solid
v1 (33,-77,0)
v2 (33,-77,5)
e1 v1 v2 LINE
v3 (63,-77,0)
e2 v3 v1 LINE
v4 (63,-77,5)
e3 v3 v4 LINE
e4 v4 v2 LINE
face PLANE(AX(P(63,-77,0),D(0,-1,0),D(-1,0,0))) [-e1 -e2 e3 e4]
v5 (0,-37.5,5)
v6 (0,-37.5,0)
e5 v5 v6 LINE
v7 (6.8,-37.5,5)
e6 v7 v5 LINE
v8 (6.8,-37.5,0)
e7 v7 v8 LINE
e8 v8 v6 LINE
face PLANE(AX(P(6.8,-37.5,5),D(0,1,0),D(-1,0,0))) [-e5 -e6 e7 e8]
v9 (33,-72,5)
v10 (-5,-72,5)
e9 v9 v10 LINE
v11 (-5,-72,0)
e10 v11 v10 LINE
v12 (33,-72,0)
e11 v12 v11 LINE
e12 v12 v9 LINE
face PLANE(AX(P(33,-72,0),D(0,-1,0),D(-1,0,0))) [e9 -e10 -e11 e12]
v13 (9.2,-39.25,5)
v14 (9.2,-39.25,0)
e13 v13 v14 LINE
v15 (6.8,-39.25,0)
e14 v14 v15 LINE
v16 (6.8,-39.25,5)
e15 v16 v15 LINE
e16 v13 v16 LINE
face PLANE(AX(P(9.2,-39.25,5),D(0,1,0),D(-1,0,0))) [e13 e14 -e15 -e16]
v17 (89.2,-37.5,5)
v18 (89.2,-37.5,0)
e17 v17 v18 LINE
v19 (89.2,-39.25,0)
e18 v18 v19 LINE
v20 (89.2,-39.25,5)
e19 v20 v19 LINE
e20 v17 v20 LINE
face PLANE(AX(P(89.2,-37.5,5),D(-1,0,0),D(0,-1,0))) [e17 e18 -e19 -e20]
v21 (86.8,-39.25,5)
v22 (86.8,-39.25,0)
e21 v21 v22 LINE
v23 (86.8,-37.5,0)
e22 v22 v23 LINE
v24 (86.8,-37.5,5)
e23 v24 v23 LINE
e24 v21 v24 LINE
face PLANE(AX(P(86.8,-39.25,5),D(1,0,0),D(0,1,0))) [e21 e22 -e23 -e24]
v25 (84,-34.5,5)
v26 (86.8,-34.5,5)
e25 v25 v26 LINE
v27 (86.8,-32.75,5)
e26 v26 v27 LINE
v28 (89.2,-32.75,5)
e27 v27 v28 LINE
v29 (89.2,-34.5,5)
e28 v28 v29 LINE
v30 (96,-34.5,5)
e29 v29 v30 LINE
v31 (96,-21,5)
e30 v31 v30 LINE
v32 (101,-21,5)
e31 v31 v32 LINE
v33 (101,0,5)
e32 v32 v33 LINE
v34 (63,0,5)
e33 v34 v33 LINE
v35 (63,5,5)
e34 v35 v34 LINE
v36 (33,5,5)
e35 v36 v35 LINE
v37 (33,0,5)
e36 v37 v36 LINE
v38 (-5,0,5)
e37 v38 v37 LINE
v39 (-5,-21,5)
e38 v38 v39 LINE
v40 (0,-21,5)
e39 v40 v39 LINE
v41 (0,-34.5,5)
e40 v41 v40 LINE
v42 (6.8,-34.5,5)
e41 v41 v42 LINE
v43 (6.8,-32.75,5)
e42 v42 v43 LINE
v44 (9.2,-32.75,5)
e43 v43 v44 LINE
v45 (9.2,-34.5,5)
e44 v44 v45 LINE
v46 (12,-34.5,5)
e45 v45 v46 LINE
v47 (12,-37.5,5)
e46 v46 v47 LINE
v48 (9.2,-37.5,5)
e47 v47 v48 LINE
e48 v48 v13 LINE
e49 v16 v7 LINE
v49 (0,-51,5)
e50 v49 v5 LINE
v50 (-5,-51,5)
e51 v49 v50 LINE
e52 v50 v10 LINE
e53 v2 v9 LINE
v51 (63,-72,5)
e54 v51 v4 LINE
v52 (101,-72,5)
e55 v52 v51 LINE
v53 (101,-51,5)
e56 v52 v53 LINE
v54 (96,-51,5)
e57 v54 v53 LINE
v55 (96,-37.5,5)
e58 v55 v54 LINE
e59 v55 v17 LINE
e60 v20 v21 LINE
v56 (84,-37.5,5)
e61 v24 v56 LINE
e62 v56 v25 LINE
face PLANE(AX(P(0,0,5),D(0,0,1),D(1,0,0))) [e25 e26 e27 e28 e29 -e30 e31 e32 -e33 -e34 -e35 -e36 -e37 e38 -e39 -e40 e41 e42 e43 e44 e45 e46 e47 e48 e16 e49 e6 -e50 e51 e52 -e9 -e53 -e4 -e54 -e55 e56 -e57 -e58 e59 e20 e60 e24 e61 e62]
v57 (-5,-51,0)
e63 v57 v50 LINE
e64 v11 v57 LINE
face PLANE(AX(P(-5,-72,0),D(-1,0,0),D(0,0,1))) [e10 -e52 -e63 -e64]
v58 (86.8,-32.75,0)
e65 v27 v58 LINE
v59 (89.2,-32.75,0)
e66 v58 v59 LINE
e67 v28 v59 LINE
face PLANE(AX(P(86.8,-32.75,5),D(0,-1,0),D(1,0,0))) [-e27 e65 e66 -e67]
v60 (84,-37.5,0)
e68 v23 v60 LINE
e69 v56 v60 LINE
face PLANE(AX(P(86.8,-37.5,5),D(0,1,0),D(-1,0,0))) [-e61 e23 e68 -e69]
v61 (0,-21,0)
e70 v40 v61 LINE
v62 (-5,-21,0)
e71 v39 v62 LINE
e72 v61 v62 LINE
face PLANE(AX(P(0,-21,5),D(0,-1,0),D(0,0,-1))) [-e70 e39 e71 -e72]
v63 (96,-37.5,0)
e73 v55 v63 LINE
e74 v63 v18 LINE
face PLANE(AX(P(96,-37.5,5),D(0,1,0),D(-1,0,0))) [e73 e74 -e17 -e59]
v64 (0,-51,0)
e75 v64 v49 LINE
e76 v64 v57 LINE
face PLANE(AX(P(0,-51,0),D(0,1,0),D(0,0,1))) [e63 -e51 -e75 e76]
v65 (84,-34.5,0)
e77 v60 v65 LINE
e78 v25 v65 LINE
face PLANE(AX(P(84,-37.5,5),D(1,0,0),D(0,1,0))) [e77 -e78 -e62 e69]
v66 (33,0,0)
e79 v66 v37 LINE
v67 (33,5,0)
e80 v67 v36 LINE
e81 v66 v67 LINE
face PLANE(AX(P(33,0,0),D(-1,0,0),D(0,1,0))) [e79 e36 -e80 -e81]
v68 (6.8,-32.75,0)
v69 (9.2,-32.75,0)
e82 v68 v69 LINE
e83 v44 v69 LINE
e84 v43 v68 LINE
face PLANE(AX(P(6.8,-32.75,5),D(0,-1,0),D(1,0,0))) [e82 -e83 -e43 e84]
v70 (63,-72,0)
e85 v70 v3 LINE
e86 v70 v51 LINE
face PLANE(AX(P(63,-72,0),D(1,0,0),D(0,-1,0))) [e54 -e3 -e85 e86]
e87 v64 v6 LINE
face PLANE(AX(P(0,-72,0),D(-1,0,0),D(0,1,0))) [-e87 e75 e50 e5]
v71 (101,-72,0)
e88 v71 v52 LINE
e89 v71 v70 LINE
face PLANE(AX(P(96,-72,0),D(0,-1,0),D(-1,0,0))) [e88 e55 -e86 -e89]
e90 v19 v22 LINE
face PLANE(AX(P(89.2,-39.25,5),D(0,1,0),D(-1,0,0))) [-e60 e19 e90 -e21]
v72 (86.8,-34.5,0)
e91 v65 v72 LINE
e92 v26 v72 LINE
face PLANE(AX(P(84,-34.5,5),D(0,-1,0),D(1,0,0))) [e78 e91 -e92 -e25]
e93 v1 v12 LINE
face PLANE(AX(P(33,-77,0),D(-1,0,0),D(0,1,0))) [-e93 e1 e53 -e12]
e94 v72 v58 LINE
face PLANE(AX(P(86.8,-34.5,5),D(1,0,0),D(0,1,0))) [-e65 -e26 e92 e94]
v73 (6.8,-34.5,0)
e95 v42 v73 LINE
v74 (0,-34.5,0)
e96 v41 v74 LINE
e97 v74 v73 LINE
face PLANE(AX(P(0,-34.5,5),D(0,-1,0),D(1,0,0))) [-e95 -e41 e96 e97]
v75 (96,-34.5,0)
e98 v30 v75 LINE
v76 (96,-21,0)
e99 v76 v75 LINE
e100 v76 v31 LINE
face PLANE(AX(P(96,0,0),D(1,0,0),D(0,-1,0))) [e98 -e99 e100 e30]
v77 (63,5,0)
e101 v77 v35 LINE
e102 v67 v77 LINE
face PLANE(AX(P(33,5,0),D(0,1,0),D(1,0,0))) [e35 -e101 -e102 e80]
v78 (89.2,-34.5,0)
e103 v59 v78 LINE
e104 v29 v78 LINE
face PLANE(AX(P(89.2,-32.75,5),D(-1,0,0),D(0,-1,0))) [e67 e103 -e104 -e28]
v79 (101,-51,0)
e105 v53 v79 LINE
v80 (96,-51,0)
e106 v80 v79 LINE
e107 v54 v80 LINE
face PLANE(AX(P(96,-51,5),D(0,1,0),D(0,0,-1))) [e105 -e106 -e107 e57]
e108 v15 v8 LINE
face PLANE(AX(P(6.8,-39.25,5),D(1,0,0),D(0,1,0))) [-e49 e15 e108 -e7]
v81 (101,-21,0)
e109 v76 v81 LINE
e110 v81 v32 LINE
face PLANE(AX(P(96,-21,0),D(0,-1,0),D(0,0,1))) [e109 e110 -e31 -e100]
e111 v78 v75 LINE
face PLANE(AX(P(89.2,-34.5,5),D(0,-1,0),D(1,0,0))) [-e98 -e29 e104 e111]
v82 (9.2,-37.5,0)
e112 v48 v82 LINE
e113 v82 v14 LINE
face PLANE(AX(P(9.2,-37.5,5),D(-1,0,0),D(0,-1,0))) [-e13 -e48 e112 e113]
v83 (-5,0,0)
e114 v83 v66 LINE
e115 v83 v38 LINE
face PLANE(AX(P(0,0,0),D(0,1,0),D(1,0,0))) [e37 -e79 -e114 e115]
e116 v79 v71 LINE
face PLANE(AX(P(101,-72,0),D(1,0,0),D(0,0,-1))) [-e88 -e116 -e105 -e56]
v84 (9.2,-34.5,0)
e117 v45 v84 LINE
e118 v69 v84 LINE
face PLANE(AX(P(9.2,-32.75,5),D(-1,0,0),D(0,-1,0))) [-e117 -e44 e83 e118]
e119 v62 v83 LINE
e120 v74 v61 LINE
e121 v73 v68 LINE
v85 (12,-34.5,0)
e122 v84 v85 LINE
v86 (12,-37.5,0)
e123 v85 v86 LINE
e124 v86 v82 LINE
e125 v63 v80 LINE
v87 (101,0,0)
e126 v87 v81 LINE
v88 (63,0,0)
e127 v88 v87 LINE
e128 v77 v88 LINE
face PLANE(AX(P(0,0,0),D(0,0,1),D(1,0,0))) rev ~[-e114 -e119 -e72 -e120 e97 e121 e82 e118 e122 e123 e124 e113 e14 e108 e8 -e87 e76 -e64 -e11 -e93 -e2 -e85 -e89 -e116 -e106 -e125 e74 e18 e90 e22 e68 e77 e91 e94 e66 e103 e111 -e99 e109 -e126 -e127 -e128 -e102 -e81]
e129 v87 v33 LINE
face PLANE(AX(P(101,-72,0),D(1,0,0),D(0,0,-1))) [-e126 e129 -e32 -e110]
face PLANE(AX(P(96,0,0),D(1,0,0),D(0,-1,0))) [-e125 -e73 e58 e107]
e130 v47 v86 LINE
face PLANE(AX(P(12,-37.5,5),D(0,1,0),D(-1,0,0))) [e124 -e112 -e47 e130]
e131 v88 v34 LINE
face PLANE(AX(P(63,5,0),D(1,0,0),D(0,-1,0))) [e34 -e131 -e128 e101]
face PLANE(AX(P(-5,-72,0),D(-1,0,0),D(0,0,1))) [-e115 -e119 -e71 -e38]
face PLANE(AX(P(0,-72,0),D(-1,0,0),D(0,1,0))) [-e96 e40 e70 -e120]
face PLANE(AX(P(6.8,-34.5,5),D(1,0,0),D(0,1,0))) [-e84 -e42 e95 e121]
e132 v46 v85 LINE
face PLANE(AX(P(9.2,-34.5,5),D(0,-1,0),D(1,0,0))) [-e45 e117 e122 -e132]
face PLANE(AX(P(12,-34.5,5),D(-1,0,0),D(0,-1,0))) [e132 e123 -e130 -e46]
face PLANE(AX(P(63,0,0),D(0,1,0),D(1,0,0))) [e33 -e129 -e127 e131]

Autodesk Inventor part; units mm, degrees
ref_plane "YZ Plane" through (0, 0, 0) normal (1, 0, 0) x (0, 1, 0)
sketch "slot" plane through (0, 0, 0) normal (0, 0, 1) x (1, 0, 0)
  line L0 (-18.25, 14.2) -> (-11.75, 11.8) construction
  line L1 (-11.75, 14.2) -> (-18.25, 11.8) construction
  line L2 (-18.25, 14.2) -> (-16.5, 14.2)
  line L3 (-13.5, 14.2) -> (-11.75, 14.2)
  line L4 (-16.5, 9) -> (-16.5, 11.8)
  line L5 (-16.5, 14.2) -> (-16.5, 21)
  line L6 (-13.5, 21) -> (-13.5, 14.2)
  line L7 (-13.5, 11.8) -> (-13.5, 9)
  line L8 (-11.75, 11.8) -> (-13.5, 11.8)
  line L9 (-16.5, 11.8) -> (-18.25, 11.8)
  line L10 (-16.5, 21) -> (-13.5, 21)
  line L11 (-13.5, 9) -> (-16.5, 9)
  line L12 (-11.75, 14.2) -> (-11.75, 11.8)
  line L13 (-18.25, 11.8) -> (-18.25, 14.2)
  point P0 (-15, 21)
  point P1 (-15, 13)
  dimension "d8" = 3
  dimension "d9" = 12
  dimension "d10" = 6.5
  dimension "d11" = 2.4
  dimension "d12" = 8
ref_plane "工作平面1" through (0, 0, 0) normal (0, 0, 1) x (1, 0, 0)
sketch "草图2" plane through (0, 0, 0) normal (0, 0, 1) x (1, 0, 0)
  line L0 (74, -10) -> (74, -69) projected
  line L1 (74, -69) -> (69, -69) projected
  line L2 (69, -69) -> (69, -10) projected
  line L3 (69, -10) -> (74, -10) projected
  circle A0 centre (48, 2.5) radius 1.5 projected
  circle A1 centre (48, -74.5) radius 1.5 projected
  line L4 (33, -77) -> (33, -72) projected
  line L5 (63, -77) -> (33, -77) projected
  line L6 (63, -72) -> (63, -77) projected
  line L7 (96, -72) -> (63, -72) projected
  line L8 (96, 0) -> (96, -72) projected
  line L9 (63, 0) -> (96, 0) projected
  line L10 (63, 5) -> (63, 0) projected
  line L11 (33, 5) -> (63, 5) projected
  line L12 (33, 0) -> (33, 5) projected
  line L13 (0, 0) -> (33, 0) projected
  line L14 (0, -72) -> (0, 0) projected
  line L15 (33, -72) -> (0, -72) projected
extrude "拉伸2" add sketch "草图2" along normal blind 5 contours L0 L1 L2 L3 | A0 | A1 | L4 L15 L14 L13 L12 L11 L10 L9 L8 L7 L6 L5
sketch "草图3" plane through (0, -72, 0) normal (-1, 0, 0) x (0, 0, 1)
  line L0 (0, 0) -> (0, 72) projected
  line L1 (0, 0) -> (5, 0) projected
  line L2 (5, 72) -> (5, 0) projected
  line L3 (0, 72) -> (5, 72) projected
  circle A0 centre (2.5, 36) radius 1.5 projected
  circle A1 centre (-35, -2.5) radius 1.5 projected
  circle A2 centre (-85, -2.5) radius 1.5 projected
  circle A3 centre (-85, 74.5) radius 1.5 projected
  circle A4 centre (-35, 74.5) radius 1.5 projected
  line L4 (-20, 0) -> (-20, -5) projected
  line L5 (0, 0) -> (-20, 0) projected
  line L6 (0, 21) -> (0, 0) projected
  line L7 (0, 21) -> (5, 21) projected
  line L8 (5, 21) -> (5, 51) projected
  line L9 (5, 51) -> (0, 51) projected
  line L10 (0, 72) -> (0, 51) projected
  line L11 (-20, 72) -> (0, 72) projected
  line L12 (-20, 77) -> (-20, 72) projected
  line L13 (-50, 77) -> (-20, 77) projected
  line L14 (-50, 72) -> (-50, 77) projected
  line L15 (-70, 72) -> (-50, 72) projected
  line L16 (-70, 77) -> (-70, 72) projected
  line L17 (-100, 77) -> (-70, 77) projected
  line L18 (-100, 72) -> (-100, 77) projected
  line L19 (-121, 72) -> (-100, 72) projected
  line L20 (-121, 0) -> (-121, 72) projected
  line L21 (-100, 0) -> (-121, 0) projected
  line L22 (-100, -5) -> (-100, 0) projected
  line L23 (-70, -5) -> (-100, -5) projected
  line L24 (-70, 0) -> (-70, -5) projected
  line L25 (-50, 0) -> (-70, 0) projected
  line L26 (-50, -5) -> (-50, 0) projected
  line L27 (-20, -5) -> (-50, -5) projected
ref_plane "工作平面2" through (-5, -77, -121) normal (-1, 0, 0) x (0, 0, 1)
extrude "拉伸3" add sketch "草图3" along normal up to surface (5 mm away) contours L0 L7 L2 L1 | L0 L3 L2 L9
sketch "草图4" plane through (96, -72, 0) normal (1, 0, 0) x (0, 0, -1)
  line L0 (0, 72) -> (0, 0) projected
  line L1 (0, 72) -> (-5, 72) projected
  line L2 (-5, 0) -> (-5, 72) projected
  line L3 (0, 0) -> (-5, 0) projected
  circle A0 centre (-2.5, 36) radius 1.5 projected
  circle A1 centre (35, -2.5) radius 1.5 projected
  circle A2 centre (85, -2.5) radius 1.5 projected
  circle A3 centre (85, 74.5) radius 1.5 projected
  circle A4 centre (35, 74.5) radius 1.5 projected
  line L4 (20, 0) -> (20, -5) projected
  line L5 (20, -5) -> (50, -5) projected
  line L6 (50, -5) -> (50, 0) projected
  line L7 (50, 0) -> (70, 0) projected
  line L8 (70, 0) -> (70, -5) projected
  line L9 (70, -5) -> (100, -5) projected
  line L10 (100, -5) -> (100, 0) projected
  line L11 (100, 0) -> (121, 0) projected
  line L12 (121, 0) -> (121, 72) projected
  line L13 (121, 72) -> (100, 72) projected
  line L14 (100, 72) -> (100, 77) projected
  line L15 (100, 77) -> (70, 77) projected
  line L16 (70, 77) -> (70, 72) projected
  line L17 (70, 72) -> (50, 72) projected
  line L18 (50, 72) -> (50, 77) projected
  line L19 (50, 77) -> (20, 77) projected
  line L20 (20, 77) -> (20, 72) projected
  line L21 (20, 72) -> (0, 72) projected
  line L22 (0, 72) -> (0, 51) projected
  line L23 (0, 51) -> (-5, 51) projected
  line L24 (-5, 51) -> (-5, 21) projected
  line L25 (-5, 21) -> (0, 21) projected
  line L26 (0, 21) -> (0, 0) projected
  line L27 (0, 0) -> (20, 0) projected
ref_plane "工作平面3" through (101, -77, -121) normal (1, 0, 0) x (0, 1, 0)
extrude "拉伸4" add sketch "草图4" along normal up to surface (5 mm away) contours L0 L23 L2 L1 | L0 L3 L2 L25
sketch "草图5" plane through (0, 0, 5) normal (0, 0, 1) x (1, 0, 0)
  line L0 (0, -21) -> (0, -51) projected
  line L1 (96, -51) -> (96, -21) projected
  line L2 (-5, -37.5) -> (-5, -34.5) projected
  line L3 (101, -34.5) -> (101, -37.5) projected
  line L4 (6.8, -39.25) -> (9.2, -32.75) construction
  line L5 (6.8, -32.75) -> (9.2, -39.25) construction
  line L6 (6.8, -39.25) -> (6.8, -37.5)
  line L7 (6.8, -34.5) -> (6.8, -32.75)
  line L8 (12, -37.5) -> (9.2, -37.5)
  line L9 (6.8, -37.5) -> (0, -37.5)
  line L10 (0, -34.5) -> (6.8, -34.5)
  line L11 (9.2, -34.5) -> (12, -34.5)
  line L12 (9.2, -32.75) -> (9.2, -34.5)
  line L13 (9.2, -37.5) -> (9.2, -39.25)
  line L14 (0, -37.5) -> (0, -34.5)
  line L15 (12, -34.5) -> (12, -37.5)
  line L16 (6.8, -32.75) -> (9.2, -32.75)
  line L17 (9.2, -39.25) -> (6.8, -39.25)
  line L18 (89.2, -32.75) -> (86.8, -39.25) construction
  line L19 (89.2, -39.25) -> (86.8, -32.75) construction
  line L20 (89.2, -32.75) -> (89.2, -34.5)
  line L21 (89.2, -37.5) -> (89.2, -39.25)
  line L22 (84, -34.5) -> (86.8, -34.5)
  line L23 (89.2, -34.5) -> (96, -34.5)
  line L24 (96, -37.5) -> (89.2, -37.5)
  line L25 (86.8, -37.5) -> (84, -37.5)
  line L26 (86.8, -39.25) -> (86.8, -37.5)
  line L27 (86.8, -34.5) -> (86.8, -32.75)
  line L28 (96, -34.5) -> (96, -37.5)
  line L29 (84, -37.5) -> (84, -34.5)
  line L30 (89.2, -39.25) -> (86.8, -39.25)
  line L31 (86.8, -32.75) -> (89.2, -32.75)
  point P0 (0, 0)
extrude "拉伸5" cut sketch "草图5" against normal through all
properties part number "back"
